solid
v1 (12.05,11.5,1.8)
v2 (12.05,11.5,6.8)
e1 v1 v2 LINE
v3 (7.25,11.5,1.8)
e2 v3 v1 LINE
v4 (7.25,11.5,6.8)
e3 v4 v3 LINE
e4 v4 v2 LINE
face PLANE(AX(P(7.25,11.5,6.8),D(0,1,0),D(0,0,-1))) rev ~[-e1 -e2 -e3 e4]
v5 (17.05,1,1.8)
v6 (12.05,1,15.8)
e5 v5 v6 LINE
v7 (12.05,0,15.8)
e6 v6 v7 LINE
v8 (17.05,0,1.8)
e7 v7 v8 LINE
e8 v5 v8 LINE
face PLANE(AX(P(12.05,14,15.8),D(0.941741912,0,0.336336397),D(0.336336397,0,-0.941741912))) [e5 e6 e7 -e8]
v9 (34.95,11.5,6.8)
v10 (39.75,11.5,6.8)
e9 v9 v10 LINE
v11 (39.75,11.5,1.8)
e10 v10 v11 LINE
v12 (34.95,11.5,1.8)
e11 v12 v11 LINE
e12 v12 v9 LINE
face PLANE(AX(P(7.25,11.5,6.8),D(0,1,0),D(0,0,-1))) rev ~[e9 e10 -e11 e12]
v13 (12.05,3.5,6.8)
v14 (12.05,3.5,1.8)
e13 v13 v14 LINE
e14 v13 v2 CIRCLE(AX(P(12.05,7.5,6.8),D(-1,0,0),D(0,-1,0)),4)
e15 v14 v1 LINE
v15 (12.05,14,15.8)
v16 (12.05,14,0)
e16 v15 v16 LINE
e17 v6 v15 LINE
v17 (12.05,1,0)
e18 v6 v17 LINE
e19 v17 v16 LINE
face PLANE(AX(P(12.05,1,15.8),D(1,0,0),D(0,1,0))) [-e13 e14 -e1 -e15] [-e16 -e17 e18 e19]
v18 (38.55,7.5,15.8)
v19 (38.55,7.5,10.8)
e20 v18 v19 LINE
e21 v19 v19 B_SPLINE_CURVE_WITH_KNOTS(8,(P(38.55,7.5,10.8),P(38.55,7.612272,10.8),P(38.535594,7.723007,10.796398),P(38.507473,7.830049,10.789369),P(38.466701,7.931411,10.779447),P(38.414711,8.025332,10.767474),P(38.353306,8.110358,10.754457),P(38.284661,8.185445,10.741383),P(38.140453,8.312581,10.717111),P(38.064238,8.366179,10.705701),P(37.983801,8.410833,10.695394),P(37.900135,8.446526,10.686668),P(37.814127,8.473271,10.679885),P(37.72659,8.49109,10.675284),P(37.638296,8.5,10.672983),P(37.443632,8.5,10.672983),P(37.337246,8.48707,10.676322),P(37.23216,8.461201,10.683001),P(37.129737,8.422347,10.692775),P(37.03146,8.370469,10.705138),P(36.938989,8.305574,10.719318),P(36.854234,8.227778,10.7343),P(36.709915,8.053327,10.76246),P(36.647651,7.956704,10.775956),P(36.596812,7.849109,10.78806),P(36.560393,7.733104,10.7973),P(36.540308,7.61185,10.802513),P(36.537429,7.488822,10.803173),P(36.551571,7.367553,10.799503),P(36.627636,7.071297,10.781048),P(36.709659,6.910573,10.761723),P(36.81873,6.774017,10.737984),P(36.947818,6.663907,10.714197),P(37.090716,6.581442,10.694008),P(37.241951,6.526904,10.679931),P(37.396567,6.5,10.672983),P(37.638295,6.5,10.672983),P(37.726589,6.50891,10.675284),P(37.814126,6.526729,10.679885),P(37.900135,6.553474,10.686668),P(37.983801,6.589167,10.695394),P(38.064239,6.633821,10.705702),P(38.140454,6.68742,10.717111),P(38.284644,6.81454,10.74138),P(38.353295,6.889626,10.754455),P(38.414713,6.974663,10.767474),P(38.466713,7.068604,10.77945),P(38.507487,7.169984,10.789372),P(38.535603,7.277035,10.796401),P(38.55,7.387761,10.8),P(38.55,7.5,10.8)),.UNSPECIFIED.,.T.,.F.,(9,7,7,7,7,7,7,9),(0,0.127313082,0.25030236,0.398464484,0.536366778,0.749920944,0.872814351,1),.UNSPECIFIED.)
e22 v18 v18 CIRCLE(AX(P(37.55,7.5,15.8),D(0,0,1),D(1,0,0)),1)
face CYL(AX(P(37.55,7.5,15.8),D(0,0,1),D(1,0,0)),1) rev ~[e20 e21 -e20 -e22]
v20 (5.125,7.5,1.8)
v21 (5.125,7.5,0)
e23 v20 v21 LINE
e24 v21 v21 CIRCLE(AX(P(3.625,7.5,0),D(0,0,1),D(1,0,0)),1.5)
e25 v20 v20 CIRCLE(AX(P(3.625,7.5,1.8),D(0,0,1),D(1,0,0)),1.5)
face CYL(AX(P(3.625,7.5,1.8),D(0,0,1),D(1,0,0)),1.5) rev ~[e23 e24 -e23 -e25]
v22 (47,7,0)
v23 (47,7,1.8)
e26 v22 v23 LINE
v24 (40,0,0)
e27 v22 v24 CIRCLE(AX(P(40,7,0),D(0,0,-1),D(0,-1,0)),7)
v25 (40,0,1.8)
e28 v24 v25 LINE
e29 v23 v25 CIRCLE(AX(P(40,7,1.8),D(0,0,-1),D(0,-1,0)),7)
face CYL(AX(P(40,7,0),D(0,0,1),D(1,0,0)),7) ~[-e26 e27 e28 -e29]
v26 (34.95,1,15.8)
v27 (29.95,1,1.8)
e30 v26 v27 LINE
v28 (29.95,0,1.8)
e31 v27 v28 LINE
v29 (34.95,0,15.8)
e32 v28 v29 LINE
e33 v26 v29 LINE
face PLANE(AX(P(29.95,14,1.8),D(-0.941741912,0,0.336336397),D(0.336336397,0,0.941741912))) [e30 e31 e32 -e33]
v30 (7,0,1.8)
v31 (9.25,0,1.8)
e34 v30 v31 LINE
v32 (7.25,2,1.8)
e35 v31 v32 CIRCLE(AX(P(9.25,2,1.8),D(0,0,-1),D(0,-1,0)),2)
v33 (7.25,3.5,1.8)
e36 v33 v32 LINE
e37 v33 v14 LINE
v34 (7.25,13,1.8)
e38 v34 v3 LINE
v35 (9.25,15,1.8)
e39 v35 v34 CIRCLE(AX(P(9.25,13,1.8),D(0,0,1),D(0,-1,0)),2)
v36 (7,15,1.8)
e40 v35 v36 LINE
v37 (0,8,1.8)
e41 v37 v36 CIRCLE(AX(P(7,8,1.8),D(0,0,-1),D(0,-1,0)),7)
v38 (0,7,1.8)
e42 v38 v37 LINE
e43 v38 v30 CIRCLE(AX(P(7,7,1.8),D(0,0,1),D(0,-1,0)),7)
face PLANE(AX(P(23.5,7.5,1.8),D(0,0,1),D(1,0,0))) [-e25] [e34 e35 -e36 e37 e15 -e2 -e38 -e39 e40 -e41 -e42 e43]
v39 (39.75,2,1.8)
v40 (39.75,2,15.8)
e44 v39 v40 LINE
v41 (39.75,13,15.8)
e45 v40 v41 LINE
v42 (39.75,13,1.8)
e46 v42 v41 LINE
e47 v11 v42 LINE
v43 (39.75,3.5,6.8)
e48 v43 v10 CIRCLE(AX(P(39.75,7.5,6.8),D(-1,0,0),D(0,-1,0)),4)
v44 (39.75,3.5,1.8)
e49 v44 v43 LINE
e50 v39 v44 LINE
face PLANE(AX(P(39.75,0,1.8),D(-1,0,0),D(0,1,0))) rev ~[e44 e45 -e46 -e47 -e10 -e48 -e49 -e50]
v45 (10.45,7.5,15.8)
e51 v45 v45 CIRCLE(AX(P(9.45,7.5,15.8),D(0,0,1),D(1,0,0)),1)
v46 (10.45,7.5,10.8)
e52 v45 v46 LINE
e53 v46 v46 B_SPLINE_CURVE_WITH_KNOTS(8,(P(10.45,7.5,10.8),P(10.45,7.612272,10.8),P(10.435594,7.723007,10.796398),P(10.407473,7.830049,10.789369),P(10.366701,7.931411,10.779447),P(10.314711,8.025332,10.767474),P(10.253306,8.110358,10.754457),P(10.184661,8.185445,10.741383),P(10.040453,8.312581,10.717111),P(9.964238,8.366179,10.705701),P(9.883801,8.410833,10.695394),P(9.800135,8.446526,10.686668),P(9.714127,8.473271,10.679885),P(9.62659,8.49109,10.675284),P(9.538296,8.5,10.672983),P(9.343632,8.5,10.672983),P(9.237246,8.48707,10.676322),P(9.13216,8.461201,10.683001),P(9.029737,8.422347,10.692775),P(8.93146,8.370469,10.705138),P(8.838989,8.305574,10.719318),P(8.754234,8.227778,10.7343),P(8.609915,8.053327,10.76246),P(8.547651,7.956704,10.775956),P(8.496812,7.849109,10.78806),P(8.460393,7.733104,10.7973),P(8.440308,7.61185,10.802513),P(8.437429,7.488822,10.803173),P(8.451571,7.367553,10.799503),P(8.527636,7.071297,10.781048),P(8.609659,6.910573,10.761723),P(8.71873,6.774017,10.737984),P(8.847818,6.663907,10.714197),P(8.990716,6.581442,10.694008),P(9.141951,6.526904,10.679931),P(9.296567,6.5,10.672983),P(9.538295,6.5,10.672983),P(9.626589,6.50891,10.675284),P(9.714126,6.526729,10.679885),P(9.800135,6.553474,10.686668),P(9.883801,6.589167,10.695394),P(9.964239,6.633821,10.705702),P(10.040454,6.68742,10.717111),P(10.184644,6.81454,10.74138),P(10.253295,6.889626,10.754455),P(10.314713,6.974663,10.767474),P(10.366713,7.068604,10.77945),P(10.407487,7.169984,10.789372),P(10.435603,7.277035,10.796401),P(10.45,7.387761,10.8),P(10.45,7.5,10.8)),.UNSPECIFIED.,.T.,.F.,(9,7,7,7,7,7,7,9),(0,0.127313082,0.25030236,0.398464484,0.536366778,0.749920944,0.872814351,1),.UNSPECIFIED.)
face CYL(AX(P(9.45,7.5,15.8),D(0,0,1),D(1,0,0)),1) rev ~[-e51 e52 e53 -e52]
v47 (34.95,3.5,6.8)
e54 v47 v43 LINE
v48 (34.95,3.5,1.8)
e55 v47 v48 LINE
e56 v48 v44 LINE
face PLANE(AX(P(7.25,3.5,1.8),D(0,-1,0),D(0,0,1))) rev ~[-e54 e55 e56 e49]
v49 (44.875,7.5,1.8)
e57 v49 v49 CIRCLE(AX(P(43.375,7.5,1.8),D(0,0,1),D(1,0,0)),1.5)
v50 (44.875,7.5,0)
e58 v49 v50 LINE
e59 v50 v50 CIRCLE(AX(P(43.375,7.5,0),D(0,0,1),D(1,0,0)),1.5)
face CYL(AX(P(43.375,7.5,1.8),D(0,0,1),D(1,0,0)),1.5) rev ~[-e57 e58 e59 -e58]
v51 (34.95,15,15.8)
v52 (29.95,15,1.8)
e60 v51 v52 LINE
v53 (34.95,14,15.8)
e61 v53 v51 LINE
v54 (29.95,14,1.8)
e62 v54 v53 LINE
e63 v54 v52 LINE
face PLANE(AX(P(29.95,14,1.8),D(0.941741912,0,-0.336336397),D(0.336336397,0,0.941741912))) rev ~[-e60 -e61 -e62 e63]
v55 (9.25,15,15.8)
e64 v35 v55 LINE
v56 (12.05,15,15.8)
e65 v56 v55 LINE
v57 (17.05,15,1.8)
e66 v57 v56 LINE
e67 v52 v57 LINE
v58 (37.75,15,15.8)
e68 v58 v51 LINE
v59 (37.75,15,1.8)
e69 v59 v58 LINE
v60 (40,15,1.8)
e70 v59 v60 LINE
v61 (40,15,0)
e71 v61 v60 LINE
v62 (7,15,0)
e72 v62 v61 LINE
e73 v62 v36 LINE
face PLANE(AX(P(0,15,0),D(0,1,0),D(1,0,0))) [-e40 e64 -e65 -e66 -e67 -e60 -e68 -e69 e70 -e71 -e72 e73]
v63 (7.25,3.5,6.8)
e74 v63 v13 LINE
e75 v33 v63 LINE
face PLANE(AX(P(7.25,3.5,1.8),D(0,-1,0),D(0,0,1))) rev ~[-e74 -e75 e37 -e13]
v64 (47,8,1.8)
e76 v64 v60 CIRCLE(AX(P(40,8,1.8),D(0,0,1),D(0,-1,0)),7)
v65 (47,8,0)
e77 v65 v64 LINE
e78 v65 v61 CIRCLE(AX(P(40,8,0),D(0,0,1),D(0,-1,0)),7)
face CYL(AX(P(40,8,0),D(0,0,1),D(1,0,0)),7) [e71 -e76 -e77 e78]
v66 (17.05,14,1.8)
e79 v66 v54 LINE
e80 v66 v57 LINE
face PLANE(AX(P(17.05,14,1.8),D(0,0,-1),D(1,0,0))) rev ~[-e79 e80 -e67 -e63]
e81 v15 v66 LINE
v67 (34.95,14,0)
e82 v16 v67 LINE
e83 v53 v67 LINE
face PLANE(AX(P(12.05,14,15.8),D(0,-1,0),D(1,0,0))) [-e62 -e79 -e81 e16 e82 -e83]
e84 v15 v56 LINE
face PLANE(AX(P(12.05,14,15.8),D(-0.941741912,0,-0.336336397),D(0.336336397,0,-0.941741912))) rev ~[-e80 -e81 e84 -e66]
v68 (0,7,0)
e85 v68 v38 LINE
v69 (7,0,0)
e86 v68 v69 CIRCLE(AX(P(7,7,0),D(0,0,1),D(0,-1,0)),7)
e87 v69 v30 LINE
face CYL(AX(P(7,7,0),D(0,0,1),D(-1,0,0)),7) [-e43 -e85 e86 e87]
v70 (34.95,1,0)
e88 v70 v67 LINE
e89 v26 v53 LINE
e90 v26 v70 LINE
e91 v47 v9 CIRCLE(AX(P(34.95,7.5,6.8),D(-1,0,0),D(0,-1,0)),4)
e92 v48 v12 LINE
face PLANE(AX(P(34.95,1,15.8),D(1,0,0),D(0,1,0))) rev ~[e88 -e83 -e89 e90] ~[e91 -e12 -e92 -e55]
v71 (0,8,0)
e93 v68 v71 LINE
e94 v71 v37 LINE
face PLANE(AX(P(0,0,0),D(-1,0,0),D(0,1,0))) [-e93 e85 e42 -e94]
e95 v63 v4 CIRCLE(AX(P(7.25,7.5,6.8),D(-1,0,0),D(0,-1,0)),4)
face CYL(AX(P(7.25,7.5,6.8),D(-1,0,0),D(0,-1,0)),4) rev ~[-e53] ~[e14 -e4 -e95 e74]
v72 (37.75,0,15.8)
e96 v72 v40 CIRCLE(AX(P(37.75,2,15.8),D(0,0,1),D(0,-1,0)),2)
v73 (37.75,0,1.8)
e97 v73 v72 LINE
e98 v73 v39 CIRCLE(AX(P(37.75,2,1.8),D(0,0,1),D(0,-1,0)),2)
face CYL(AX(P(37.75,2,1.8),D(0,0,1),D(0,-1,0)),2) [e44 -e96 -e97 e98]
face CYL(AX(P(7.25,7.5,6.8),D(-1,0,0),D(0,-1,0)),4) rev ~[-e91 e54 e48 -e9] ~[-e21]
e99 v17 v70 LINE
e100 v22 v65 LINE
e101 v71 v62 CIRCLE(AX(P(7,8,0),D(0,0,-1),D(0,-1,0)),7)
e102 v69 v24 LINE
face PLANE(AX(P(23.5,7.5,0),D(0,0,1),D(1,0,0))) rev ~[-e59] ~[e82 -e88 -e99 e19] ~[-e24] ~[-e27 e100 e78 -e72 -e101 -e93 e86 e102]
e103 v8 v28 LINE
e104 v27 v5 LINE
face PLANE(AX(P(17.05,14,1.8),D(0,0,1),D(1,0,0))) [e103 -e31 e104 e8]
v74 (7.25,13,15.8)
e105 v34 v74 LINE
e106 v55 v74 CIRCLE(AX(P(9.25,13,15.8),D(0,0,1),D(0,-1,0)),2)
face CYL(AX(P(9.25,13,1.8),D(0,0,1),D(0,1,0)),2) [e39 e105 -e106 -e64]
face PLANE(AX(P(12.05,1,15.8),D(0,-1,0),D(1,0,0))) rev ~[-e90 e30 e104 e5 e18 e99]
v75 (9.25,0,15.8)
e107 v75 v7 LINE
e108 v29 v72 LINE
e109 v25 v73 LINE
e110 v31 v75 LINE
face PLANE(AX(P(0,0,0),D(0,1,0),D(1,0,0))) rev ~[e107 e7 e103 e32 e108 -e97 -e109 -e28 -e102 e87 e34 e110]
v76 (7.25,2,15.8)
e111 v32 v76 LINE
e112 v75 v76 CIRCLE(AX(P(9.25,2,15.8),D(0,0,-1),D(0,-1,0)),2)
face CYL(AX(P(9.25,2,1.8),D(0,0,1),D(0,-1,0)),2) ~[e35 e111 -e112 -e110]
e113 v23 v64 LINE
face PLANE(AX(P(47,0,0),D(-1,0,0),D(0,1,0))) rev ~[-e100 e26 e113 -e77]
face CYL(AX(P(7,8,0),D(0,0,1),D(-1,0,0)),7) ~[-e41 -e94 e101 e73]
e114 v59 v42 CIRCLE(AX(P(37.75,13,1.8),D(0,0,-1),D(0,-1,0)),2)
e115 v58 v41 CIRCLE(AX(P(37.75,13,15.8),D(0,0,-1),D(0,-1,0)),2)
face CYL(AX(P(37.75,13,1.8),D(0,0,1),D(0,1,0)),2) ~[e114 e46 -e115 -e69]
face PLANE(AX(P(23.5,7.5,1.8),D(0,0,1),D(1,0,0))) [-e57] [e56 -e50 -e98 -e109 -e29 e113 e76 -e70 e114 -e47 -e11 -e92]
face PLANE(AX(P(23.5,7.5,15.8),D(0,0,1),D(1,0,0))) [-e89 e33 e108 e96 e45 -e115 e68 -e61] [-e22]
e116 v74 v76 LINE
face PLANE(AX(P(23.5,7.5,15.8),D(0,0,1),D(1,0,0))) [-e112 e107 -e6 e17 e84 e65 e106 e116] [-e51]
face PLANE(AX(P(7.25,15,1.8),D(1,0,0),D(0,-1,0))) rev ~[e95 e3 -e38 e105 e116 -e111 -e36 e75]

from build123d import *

# Parameters (mm, degrees)
F0_W      = 47
F0_H      = 15
F1_DEPTH  = 1.8
F3_DEPTH  = 14
F4_W      = 22.9
F4_H      = 13
F5_DEPTH  = 15.801
F6_R      = 1
F7_DEPTH  = 7
F8_R      = 1.5
F9_R      = 1.5
F10_DEPTH = 1.801
F12_DEPTH = 39.751
F13_R     = 7
F15_DEPTH = 1.001
F16_DEPTH = 14.001
F17_R     = 2


with BuildPart() as f1:
    # F0 (on Top) → F1 (new body)
    with BuildSketch(Plane.XY):
        with Locations((23.5, 7.5)):
            Rectangle(F0_W, F0_H)
    extrude(amount=F1_DEPTH)

    # F2 (on face) → F3 (join)
    with BuildSketch(Plane.XY.offset(1.8)):
        Polygon((39.75, 15), (23.5, 15), (7.25, 15), (7.25, 0), (23.5, 0), (39.75, 0), align=None)
    extrude(amount=F3_DEPTH)

    # F4 (on face) → F5 (cut, through all)
    with BuildSketch(Plane.XY.offset(15.8)):
        with Locations((23.5, 7.5)):
            Rectangle(F4_W, F4_H)
    extrude(amount=-F5_DEPTH, mode=Mode.SUBTRACT)

    # F6 (on face) → F7 (cut)
    with BuildSketch(Plane.XY.offset(15.8)):
        with Locations((9.45, 7.5)):
            Circle(F6_R)
        with Locations((37.55, 7.5)):
            Circle(F6_R)
    extrude(amount=-F7_DEPTH, mode=Mode.SUBTRACT)

    # F8 (on face) + F9 (on face) → F10 (cut, through all)
    with BuildSketch(Plane.XY.offset(1.8)):
        with Locations((3.625, 7.5)):
            Circle(F8_R)
    with BuildSketch(Plane.XY.offset(1.8)):
        with Locations((43.375, 7.5)):
            Circle(F9_R)
    extrude(amount=-F10_DEPTH, mode=Mode.SUBTRACT)

    # F11 (on face) → F12 (cut, through all)
    with BuildSketch(Plane(origin=(7.25, 0, 0), x_dir=(0, -1, 0), z_dir=(-1, 0, 0))):
        with BuildLine():
            Line((-11.5, 1.8), (-3.5, 1.8))
            Line((-3.5, 1.8), (-3.5, 6.8))
            ThreePointArc((-3.5, 6.8), (-7.5, 10.8), (-11.5, 6.8))
            Line((-11.5, 6.8), (-11.5, 1.8))
        make_face()
    extrude(amount=-F12_DEPTH, mode=Mode.SUBTRACT)

    # F13
    f13_edges = [f1.edges().sort_by_distance(p)[0] for p in [
        (0, 15, 0.9),
        (0, 0, 0.9),
        (47, 0, 0.9),
        (47, 15, 0.9),
    ]]
    fillet(f13_edges, radius=F13_R)

    # F14 (on face) → F15 (cut, through all)
    with BuildSketch(Plane.XZ.offset(-14)):
        Polygon((34.95, 15.8), (12.05, 15.8), (17.05, 1.8), (29.95, 1.8), align=None)
    extrude(amount=-F15_DEPTH, mode=Mode.SUBTRACT)

    # F14 (on face) → F16 (cut, through all)
    with BuildSketch(Plane.XZ.offset(-14)):
        Polygon((34.95, 15.8), (12.05, 15.8), (17.05, 1.8), (29.95, 1.8), align=None)
    extrude(amount=F16_DEPTH, mode=Mode.SUBTRACT)

    # F17
    f17_edges = [f1.edges().sort_by_distance(p)[0] for p in [
        (39.75, 15, 8.8),
        (39.75, 0, 8.8),
        (7.25, 0, 8.8),
        (7.25, 15, 8.8),
    ]]
    fillet(f17_edges, radius=F17_R)


solid = f1.part
